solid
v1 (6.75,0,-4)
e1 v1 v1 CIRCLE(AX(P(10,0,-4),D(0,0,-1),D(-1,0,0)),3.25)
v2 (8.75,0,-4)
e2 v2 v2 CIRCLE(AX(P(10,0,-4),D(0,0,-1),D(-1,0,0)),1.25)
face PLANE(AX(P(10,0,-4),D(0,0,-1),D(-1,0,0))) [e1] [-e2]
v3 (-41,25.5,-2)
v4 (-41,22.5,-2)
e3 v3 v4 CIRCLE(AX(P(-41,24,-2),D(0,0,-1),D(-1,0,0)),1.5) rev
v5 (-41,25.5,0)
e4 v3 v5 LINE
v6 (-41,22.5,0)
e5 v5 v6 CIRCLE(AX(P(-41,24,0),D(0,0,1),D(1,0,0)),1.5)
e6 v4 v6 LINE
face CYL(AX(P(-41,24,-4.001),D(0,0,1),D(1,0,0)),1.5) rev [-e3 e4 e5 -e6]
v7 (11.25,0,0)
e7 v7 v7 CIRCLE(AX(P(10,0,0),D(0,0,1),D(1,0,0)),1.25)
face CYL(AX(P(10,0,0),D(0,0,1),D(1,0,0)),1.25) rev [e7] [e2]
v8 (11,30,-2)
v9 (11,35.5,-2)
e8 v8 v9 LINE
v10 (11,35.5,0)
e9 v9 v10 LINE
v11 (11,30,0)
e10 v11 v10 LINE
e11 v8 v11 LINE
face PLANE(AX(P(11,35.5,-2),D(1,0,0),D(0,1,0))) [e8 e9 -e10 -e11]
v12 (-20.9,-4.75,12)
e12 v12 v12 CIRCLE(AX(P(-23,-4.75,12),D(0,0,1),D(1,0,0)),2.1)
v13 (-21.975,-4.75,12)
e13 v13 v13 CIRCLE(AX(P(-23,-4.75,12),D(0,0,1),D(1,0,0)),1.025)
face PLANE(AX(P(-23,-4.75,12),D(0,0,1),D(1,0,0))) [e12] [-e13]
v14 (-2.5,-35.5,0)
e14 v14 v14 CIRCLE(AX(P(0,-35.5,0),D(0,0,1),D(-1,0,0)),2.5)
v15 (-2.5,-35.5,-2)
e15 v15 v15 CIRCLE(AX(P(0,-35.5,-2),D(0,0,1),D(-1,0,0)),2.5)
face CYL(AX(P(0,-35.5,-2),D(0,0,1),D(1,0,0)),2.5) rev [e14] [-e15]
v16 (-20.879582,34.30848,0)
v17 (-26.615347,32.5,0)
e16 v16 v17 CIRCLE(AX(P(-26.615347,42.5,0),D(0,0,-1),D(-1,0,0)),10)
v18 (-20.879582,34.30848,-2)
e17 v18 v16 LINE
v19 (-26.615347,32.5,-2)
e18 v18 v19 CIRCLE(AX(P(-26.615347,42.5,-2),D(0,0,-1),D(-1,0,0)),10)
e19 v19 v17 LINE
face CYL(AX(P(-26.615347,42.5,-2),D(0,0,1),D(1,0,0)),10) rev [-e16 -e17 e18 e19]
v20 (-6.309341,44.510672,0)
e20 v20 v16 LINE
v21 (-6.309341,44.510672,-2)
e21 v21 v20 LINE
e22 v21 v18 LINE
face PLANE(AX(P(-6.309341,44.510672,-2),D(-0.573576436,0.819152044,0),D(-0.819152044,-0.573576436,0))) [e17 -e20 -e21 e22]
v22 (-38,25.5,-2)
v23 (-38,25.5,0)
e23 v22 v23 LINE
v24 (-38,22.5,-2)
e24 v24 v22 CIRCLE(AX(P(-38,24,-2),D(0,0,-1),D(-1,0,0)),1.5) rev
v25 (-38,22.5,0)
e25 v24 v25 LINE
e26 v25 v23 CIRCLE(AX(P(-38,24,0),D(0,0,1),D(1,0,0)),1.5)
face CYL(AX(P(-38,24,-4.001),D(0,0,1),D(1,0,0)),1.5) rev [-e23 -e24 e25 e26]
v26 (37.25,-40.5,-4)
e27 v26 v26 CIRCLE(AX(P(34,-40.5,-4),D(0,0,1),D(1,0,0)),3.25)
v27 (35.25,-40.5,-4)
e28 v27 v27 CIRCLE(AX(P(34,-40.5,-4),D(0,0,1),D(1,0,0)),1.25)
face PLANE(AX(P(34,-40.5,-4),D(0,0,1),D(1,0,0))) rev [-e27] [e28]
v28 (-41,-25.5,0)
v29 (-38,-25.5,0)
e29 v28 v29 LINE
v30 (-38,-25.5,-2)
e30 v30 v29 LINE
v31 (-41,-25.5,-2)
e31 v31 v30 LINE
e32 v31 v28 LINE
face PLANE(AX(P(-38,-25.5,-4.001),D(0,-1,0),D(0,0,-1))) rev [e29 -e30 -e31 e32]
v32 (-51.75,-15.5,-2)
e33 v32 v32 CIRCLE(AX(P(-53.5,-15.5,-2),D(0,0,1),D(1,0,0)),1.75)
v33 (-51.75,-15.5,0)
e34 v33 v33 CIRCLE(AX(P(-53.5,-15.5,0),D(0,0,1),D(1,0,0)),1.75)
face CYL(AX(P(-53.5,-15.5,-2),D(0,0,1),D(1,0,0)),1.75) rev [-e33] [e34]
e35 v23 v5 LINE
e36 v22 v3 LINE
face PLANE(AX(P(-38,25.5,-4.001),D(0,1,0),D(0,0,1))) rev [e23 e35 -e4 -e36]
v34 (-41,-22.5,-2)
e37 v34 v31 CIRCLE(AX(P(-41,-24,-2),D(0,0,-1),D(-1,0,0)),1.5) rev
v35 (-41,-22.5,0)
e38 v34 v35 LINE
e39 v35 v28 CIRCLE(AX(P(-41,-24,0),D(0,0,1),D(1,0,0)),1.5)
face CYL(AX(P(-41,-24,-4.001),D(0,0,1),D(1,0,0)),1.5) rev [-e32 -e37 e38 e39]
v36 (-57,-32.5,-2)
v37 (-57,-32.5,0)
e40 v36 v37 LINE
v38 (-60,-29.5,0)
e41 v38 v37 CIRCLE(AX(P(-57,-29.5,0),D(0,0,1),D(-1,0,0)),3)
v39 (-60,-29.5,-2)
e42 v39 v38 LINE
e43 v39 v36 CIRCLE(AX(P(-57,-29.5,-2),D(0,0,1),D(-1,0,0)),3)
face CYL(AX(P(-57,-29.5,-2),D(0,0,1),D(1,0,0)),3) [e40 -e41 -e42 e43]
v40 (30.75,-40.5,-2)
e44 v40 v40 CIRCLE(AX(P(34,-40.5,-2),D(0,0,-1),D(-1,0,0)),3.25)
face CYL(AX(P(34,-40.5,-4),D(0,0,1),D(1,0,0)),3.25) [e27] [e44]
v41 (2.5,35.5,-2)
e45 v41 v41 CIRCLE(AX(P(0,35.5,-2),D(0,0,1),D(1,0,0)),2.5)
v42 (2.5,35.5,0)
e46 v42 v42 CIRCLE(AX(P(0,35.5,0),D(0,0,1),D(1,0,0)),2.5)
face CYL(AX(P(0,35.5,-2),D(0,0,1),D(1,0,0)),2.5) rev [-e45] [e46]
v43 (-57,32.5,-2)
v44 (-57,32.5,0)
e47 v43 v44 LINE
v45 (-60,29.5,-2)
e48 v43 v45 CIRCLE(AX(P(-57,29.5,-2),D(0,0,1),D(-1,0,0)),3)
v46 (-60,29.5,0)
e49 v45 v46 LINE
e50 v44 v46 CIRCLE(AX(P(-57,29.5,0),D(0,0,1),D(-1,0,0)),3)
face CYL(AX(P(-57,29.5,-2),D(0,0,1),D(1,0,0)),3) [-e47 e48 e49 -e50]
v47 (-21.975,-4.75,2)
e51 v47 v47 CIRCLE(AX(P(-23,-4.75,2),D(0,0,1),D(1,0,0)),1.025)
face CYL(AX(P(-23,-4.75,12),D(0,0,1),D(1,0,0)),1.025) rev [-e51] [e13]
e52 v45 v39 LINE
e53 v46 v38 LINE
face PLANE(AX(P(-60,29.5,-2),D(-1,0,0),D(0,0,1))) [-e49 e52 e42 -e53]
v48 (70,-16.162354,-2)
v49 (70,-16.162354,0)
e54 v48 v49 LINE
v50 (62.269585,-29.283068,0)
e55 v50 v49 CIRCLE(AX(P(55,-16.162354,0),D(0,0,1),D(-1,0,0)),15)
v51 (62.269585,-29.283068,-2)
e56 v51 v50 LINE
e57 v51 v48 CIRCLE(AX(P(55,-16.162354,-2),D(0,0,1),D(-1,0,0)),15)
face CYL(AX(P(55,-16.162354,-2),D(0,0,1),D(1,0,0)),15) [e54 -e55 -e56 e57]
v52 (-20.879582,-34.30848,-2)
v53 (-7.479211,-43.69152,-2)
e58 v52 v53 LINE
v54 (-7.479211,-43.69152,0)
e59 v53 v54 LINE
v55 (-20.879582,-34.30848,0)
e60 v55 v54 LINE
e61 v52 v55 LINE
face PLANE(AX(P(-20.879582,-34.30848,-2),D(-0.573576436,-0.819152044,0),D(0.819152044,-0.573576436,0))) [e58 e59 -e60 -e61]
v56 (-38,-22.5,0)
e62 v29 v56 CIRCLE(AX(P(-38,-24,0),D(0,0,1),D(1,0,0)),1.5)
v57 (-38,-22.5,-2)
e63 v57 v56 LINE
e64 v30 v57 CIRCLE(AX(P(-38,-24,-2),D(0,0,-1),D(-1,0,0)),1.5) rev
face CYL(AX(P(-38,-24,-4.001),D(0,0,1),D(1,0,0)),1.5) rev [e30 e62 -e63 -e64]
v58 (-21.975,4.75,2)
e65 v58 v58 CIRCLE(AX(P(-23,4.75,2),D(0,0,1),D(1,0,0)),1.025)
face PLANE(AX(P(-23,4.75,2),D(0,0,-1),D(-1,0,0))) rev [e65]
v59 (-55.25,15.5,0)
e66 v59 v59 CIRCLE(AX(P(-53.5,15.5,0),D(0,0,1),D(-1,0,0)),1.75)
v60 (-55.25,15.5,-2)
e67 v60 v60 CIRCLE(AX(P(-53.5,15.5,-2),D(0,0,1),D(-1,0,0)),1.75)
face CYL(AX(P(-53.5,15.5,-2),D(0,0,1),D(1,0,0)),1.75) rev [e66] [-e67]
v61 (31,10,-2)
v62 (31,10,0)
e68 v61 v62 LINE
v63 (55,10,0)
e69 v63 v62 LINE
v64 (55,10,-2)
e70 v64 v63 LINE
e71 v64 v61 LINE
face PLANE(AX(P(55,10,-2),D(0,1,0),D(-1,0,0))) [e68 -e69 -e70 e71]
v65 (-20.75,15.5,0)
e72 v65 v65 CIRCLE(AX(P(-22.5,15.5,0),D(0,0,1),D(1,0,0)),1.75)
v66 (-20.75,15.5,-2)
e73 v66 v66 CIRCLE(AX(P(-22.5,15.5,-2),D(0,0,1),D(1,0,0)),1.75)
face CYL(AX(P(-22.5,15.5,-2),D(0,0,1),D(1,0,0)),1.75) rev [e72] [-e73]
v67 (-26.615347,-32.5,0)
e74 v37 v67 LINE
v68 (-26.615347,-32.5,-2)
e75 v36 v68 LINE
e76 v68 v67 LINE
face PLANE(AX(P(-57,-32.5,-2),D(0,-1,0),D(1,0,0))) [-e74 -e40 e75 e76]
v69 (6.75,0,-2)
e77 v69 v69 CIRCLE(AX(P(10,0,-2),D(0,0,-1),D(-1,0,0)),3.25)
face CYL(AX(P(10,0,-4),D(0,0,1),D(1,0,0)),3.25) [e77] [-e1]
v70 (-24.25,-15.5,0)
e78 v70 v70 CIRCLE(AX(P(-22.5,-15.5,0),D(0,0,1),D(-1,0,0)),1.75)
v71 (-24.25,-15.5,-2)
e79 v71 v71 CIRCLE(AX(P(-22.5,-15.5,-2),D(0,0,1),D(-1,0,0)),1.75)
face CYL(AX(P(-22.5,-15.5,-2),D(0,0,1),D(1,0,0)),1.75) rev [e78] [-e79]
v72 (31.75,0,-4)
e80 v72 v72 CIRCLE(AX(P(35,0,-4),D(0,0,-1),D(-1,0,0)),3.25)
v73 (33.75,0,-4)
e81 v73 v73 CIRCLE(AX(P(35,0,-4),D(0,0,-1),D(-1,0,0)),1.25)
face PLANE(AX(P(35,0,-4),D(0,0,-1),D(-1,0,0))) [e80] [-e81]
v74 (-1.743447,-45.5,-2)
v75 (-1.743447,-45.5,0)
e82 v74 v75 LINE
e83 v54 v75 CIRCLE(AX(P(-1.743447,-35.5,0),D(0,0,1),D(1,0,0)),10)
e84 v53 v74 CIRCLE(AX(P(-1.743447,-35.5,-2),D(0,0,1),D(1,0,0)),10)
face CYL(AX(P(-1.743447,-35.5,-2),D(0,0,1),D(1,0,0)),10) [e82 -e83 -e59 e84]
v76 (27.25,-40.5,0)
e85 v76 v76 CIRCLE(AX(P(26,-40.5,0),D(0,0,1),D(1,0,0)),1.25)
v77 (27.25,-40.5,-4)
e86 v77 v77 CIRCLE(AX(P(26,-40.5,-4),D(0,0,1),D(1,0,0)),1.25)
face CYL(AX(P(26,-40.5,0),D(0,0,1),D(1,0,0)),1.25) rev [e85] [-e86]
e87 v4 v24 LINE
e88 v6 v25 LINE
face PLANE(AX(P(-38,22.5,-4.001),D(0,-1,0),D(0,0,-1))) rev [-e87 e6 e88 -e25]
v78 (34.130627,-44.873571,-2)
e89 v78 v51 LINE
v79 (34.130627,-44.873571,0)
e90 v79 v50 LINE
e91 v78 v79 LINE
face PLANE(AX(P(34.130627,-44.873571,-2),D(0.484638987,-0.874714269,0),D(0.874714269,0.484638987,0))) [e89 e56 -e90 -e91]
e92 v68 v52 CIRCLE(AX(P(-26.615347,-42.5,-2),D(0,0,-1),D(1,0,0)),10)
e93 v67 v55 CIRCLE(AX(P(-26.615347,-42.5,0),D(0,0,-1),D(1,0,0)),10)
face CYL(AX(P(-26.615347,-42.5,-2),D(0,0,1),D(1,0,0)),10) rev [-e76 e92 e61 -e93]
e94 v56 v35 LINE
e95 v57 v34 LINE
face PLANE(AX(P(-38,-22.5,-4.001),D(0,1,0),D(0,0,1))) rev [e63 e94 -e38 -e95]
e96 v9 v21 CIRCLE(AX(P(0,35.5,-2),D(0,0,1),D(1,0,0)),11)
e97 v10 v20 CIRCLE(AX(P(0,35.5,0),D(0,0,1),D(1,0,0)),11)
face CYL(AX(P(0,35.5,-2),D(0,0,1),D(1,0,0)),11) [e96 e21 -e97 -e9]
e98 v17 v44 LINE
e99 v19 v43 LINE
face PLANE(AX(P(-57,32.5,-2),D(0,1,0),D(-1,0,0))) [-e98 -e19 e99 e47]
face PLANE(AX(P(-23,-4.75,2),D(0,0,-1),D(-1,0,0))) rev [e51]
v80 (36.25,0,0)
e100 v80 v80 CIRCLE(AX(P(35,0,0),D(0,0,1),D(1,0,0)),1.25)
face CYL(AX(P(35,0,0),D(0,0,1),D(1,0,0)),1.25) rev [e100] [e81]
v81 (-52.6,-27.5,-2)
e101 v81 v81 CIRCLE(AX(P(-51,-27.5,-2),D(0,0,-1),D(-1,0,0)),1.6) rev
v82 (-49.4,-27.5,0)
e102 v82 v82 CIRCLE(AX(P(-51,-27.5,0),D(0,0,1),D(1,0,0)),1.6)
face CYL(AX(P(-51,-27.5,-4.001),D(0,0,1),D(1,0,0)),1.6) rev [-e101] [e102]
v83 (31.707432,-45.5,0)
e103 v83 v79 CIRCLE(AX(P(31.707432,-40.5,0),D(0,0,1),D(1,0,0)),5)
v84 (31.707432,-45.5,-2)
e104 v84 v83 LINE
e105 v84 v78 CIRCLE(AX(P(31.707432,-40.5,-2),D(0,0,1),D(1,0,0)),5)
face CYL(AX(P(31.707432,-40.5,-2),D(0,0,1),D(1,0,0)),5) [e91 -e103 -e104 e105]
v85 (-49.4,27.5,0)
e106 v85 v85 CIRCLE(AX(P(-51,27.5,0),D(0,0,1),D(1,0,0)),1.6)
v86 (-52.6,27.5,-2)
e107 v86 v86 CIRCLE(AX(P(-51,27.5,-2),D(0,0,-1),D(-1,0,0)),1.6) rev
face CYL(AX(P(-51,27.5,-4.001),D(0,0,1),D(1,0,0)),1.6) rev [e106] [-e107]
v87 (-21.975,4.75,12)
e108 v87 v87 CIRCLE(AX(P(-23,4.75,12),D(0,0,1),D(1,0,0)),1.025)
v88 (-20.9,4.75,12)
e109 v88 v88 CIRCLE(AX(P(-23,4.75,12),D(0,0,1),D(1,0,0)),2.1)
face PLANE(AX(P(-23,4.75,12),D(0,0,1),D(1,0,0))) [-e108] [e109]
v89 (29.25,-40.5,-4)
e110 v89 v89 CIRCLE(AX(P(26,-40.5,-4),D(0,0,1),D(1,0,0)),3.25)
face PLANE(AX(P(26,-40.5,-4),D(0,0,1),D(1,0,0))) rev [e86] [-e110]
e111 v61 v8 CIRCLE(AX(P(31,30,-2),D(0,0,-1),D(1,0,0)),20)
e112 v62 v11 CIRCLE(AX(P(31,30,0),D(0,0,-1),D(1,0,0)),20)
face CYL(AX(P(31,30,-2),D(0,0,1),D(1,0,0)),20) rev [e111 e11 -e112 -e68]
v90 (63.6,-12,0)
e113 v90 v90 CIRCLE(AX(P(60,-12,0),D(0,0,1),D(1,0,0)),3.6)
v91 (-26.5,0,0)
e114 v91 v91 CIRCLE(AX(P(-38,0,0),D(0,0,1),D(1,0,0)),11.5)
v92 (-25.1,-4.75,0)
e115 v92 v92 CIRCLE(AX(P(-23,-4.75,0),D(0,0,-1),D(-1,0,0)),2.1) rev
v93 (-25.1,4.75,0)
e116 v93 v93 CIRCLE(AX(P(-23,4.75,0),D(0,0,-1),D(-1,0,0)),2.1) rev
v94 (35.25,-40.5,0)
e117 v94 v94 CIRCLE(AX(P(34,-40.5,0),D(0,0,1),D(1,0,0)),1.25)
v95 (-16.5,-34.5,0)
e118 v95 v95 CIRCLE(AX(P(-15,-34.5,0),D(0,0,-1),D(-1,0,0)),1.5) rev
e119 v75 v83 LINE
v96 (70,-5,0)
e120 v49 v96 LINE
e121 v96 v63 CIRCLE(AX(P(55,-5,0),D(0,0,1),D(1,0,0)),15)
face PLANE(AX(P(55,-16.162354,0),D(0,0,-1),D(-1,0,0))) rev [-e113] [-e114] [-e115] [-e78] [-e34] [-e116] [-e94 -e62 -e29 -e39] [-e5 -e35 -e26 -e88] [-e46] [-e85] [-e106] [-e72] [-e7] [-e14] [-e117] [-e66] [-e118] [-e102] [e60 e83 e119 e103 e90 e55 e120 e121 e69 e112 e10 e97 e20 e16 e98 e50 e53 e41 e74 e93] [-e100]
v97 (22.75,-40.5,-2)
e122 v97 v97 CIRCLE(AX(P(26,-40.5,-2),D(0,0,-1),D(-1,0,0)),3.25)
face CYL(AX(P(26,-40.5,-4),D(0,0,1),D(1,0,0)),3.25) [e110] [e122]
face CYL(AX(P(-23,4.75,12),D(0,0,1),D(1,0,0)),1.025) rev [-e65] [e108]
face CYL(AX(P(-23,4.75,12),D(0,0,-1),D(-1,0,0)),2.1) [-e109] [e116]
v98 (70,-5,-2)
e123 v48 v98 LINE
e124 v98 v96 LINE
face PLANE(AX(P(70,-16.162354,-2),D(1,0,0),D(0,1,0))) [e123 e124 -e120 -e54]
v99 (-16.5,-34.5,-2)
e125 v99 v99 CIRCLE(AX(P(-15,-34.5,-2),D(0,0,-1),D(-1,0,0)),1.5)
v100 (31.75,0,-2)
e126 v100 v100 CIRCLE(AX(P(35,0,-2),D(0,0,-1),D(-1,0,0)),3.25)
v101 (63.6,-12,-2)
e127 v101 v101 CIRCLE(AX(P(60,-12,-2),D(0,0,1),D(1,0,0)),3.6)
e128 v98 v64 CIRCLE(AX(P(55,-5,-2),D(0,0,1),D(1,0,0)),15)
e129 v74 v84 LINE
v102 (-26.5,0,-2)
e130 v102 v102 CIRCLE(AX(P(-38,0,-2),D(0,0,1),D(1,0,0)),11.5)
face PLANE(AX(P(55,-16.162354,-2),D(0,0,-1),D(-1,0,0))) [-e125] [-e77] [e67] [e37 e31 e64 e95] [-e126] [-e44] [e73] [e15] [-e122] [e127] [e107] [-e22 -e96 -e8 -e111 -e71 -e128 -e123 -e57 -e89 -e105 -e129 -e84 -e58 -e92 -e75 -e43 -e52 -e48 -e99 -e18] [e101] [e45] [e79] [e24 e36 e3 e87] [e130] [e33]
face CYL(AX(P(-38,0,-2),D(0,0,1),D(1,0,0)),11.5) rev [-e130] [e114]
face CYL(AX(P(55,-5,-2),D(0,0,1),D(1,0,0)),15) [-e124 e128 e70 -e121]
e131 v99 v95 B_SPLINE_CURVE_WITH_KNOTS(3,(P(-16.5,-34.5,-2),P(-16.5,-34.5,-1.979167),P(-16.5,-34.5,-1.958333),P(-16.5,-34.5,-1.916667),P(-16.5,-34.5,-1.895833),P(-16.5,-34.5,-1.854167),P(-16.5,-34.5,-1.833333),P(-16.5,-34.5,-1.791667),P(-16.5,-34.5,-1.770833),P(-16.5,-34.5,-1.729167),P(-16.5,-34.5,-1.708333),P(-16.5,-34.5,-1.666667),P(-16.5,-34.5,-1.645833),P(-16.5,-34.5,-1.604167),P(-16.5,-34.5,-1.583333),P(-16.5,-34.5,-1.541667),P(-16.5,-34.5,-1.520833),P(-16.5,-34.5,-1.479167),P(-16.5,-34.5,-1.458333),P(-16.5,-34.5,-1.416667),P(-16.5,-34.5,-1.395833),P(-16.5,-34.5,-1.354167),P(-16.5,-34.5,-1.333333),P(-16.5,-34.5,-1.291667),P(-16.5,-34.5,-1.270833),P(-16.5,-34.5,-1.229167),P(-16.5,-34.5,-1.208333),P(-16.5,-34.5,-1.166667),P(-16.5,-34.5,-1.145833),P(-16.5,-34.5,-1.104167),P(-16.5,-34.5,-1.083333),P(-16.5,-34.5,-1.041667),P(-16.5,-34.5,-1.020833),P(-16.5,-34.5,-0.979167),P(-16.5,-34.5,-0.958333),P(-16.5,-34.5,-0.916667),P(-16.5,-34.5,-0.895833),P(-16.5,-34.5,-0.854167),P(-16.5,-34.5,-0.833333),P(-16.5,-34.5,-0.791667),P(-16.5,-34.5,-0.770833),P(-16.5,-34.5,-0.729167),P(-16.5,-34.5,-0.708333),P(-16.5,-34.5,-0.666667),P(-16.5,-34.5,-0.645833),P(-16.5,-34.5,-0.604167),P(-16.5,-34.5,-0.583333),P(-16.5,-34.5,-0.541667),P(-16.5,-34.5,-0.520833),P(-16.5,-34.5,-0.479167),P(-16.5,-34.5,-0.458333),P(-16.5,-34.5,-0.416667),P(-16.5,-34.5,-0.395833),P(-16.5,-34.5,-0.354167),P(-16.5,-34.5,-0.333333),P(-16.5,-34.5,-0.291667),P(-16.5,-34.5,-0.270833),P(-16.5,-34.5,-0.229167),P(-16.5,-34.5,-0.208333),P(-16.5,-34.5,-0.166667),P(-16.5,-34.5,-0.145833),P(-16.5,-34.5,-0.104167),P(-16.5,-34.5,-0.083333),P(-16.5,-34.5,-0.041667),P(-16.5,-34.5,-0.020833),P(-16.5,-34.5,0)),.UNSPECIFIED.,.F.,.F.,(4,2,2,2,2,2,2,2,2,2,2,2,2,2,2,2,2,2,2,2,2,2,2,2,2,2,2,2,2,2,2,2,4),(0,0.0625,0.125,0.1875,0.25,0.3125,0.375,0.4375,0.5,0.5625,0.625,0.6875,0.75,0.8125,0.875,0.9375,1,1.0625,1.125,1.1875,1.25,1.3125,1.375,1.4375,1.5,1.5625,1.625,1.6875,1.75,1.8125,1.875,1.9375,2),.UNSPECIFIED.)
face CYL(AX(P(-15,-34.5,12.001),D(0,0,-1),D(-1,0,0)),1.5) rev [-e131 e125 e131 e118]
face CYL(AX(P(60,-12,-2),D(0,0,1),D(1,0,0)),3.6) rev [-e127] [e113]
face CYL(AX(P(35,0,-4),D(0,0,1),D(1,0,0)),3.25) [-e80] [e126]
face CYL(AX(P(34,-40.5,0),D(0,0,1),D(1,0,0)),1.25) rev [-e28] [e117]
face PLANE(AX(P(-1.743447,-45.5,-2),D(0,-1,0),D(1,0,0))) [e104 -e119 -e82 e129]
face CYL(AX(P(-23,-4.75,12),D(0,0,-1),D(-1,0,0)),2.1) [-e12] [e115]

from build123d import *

# Parameters (mm, degrees)
SKETCH_1_R               = 11.5
SKETCH_1_R_2             = 1.75
SKETCH_1_R_3             = 2.5
SKETCH_1_R_4             = 3.6
SM_BASE_FLANGE_1_DEPTH   = 2
SKETCH_4_R               = 3.25
EXTRUDE_1_DEPTH          = 2
HOLE_WIZARD_M3_2_D       = 2.5
CUT_EXTRUDE_1_REACH      = 86.132
SKETCH_8_R               = 2.1
EXTRUDE_2_DEPTH          = 12
HOLE_WIZARD_M2_5_1_D     = 2.05
HOLE_WIZARD_M2_5_1_DEPTH = 10
CUT_EXTRUDE_2_REACH      = 86.89
SKETCH_11_R              = 1.6
SKETCH_12_R              = 3.25
EXTRUDE_3_DEPTH          = 2
HOLE_WIZARD_M3_3_D       = 2.5
CUT_EXTRUDE_3_REACH      = 87.195
SKETCH_15_R              = 1.5


# Sheet-metal steps are written as plain solids
with BuildPart() as part:
    # Sketch 1 → 基体-法兰1 (new body)
    with BuildSketch(Plane.XY):
        with BuildLine():
            Line((-1.743446796, -45.5), (31.707432394, -45.5))
            ThreePointArc((31.707432394, -45.5), (32.958860234, -45.340860292), (34.130627329, -44.873571345))
            Line((34.130627329, -44.873571345), (62.269584803, -29.283067879))
            ThreePointArc((62.269584803, -29.283067879), (67.923694751, -23.776689927), (70, -16.162353844))
            Line((70, -16.162353844), (70, -5))
            ThreePointArc((70, -5), (65.606601718, 5.606601718), (55, 10))
            Line((55, 10), (31, 10))
            ThreePointArc((31, 10), (16.857864376, 15.857864376), (11, 30))
            Line((11, 30), (11, 35.5))
            ThreePointArc((11, 35.5), (5.079234746, 45.257119165), (-6.3093408, 44.510672487))
            Line((-6.3093408, 44.510672487), (-20.879582297, 34.308479557))
            ThreePointArc((-20.879582297, 34.308479557), (-23.608288666, 32.962830493), (-26.615346661, 32.5))
            Line((-26.615346661, 32.5), (-57, 32.5))
            ThreePointArc((-57, 32.5), (-59.121320344, 31.621320344), (-60, 29.5))
            Line((-60, 29.5), (-60, -29.5))
            ThreePointArc((-60, -29.5), (-59.121320344, -31.621320344), (-57, -32.5))
            Line((-57, -32.5), (-26.615346661, -32.5))
            ThreePointArc((-26.615346661, -32.5), (-23.608288666, -32.962830493), (-20.879582297, -34.308479557))
            Line((-20.879582297, -34.308479557), (-7.479211159, -43.691520443))
            ThreePointArc((-7.479211159, -43.691520443), (-4.750504791, -45.037169507), (-1.743446796, -45.5))
        make_face()
        with Locations((-38, 0)):
            Circle(SKETCH_1_R, mode=Mode.SUBTRACT)
        with Locations((-22.5, 15.5)):
            Circle(SKETCH_1_R_2, mode=Mode.SUBTRACT)
        with Locations(Location((-22.5, -15.5, 0), (0, 0, 180))):
            Circle(SKETCH_1_R_2, mode=Mode.SUBTRACT)
        with Locations((0, 35.5)):
            Circle(SKETCH_1_R_3, mode=Mode.SUBTRACT)
        with Locations(Location((0, -35.5, 0), (0, 0, 180))):
            Circle(SKETCH_1_R_3, mode=Mode.SUBTRACT)
        with Locations((-53.5, -15.5)):
            Circle(SKETCH_1_R_2, mode=Mode.SUBTRACT)
        with Locations(Location((-53.5, 15.5, 0), (0, 0, 180))):
            Circle(SKETCH_1_R_2, mode=Mode.SUBTRACT)
        with Locations((60, -12)):
            Circle(SKETCH_1_R_4, mode=Mode.SUBTRACT)
    extrude(amount=-SM_BASE_FLANGE_1_DEPTH)

    # 草图4 → 凸台-拉伸1 (add)
    with BuildSketch(Plane(origin=(0, 0, -2), x_dir=(-1, 0, 0), z_dir=(0, 0, -1))):
        with Locations((-10, 0)):
            Circle(SKETCH_4_R)
        with Locations((-35, 0)):
            Circle(SKETCH_4_R)
    extrude(amount=EXTRUDE_1_DEPTH)

    # M3 螺纹孔2 (through all)
    with Locations(Plane(origin=(0, 0, 0), x_dir=(-1, 0, 0), z_dir=(0, 0, 1))):
        with Locations((-10, 0), (-35, 0)):
            Hole(HOLE_WIZARD_M3_2_D / 2)

    # 草图7 → 切除-拉伸1 (cut, up to next)
    with BuildSketch(Plane.XY, mode=Mode.PRIVATE) as cut_extrude_1_sk1:
        with BuildLine():
            Line((-38, 22.5), (-41, 22.5))
            ThreePointArc((-41, 22.5), (-42.5, 24), (-41, 25.5))
            Line((-41, 25.5), (-38, 25.5))
            ThreePointArc((-38, 25.5), (-36.5, 24), (-38, 22.5))
        make_face()
    cut_extrude_1_tool1 = extrude(cut_extrude_1_sk1.sketch, amount=-CUT_EXTRUDE_1_REACH, mode=Mode.PRIVATE) & part.part
    # 草图7 → 切除-拉伸1 (cut, up to next)
    with BuildSketch(Plane.XY, mode=Mode.PRIVATE) as cut_extrude_1_sk2:
        with BuildLine():
            Line((-38, -25.5), (-41, -25.5))
            ThreePointArc((-41, -25.5), (-42.5, -24), (-41, -22.5))
            Line((-41, -22.5), (-38, -22.5))
            ThreePointArc((-38, -22.5), (-36.5, -24), (-38, -25.5))
        make_face()
    cut_extrude_1_tool2 = extrude(cut_extrude_1_sk2.sketch, amount=-CUT_EXTRUDE_1_REACH, mode=Mode.PRIVATE) & part.part
    add(cut_extrude_1_tool1.solids().sort_by_distance((-39.5, 24, 0))[0], mode=Mode.SUBTRACT)
    add(cut_extrude_1_tool2.solids().sort_by_distance((-39.5, -24, 0))[0], mode=Mode.SUBTRACT)

    # 草图8 → 凸台-拉伸2 (add)
    with BuildSketch(Plane.XY):
        with Locations(Location((-23, 4.75, 0), (0, 0, 180))):
            Circle(SKETCH_8_R)
        with Locations(Location((-23, -4.75, 0), (0, 0, 180))):
            Circle(SKETCH_8_R)
    extrude(amount=EXTRUDE_2_DEPTH)

    # M2.5 螺纹孔1
    with Locations(Plane.XY.offset(12)):
        with Locations((-23, 4.75), (-23, -4.75)):
            Hole(HOLE_WIZARD_M2_5_1_D / 2, depth=HOLE_WIZARD_M2_5_1_DEPTH)

    # 草图11 → 切除-拉伸2 (cut, up to next)
    with BuildSketch(Plane.XY, mode=Mode.PRIVATE) as cut_extrude_2_sk1:
        with Locations((-51, 27.5)):
            Circle(SKETCH_11_R)
    cut_extrude_2_tool1 = extrude(cut_extrude_2_sk1.sketch, amount=-CUT_EXTRUDE_2_REACH, mode=Mode.PRIVATE) & part.part
    # 草图11 → 切除-拉伸2 (cut, up to next)
    with BuildSketch(Plane.XY, mode=Mode.PRIVATE) as cut_extrude_2_sk2:
        with Locations((-51, -27.5)):
            Circle(SKETCH_11_R)
    cut_extrude_2_tool2 = extrude(cut_extrude_2_sk2.sketch, amount=-CUT_EXTRUDE_2_REACH, mode=Mode.PRIVATE) & part.part
    add(cut_extrude_2_tool1.solids().sort_by_distance((-51, 27.5, 0))[0], mode=Mode.SUBTRACT)
    add(cut_extrude_2_tool2.solids().sort_by_distance((-51, -27.5, 0))[0], mode=Mode.SUBTRACT)

    # 草图12 → 凸台-拉伸3 (add)
    with BuildSketch(Plane.XY.offset(-2)):
        with Locations((26, -40.5)):
            Circle(SKETCH_12_R)
        with Locations((34, -40.5)):
            Circle(SKETCH_12_R)
    extrude(amount=-EXTRUDE_3_DEPTH)

    # M3 螺纹孔3 (through all)
    with Locations(Plane(origin=(0, 0, 0), x_dir=(-1, 0, 0), z_dir=(0, 0, 1))):
        with Locations((-34, 40.5), (-26, 40.5)):
            Hole(HOLE_WIZARD_M3_3_D / 2)

    # 草图15 → 切除-拉伸3 (cut, up to next)
    with BuildSketch(Plane(origin=(0, 0, -2), x_dir=(-1, 0, 0), z_dir=(0, 0, -1)), mode=Mode.PRIVATE) as cut_extrude_3_sk1:
        with Locations((15, -34.5)):
            Circle(SKETCH_15_R)
    cut_extrude_3_tool1 = extrude(cut_extrude_3_sk1.sketch, amount=-CUT_EXTRUDE_3_REACH, mode=Mode.PRIVATE) & part.part
    add(cut_extrude_3_tool1.solids().sort_by_distance((-15, -34.5, -2))[0], mode=Mode.SUBTRACT)


solid = part.part
